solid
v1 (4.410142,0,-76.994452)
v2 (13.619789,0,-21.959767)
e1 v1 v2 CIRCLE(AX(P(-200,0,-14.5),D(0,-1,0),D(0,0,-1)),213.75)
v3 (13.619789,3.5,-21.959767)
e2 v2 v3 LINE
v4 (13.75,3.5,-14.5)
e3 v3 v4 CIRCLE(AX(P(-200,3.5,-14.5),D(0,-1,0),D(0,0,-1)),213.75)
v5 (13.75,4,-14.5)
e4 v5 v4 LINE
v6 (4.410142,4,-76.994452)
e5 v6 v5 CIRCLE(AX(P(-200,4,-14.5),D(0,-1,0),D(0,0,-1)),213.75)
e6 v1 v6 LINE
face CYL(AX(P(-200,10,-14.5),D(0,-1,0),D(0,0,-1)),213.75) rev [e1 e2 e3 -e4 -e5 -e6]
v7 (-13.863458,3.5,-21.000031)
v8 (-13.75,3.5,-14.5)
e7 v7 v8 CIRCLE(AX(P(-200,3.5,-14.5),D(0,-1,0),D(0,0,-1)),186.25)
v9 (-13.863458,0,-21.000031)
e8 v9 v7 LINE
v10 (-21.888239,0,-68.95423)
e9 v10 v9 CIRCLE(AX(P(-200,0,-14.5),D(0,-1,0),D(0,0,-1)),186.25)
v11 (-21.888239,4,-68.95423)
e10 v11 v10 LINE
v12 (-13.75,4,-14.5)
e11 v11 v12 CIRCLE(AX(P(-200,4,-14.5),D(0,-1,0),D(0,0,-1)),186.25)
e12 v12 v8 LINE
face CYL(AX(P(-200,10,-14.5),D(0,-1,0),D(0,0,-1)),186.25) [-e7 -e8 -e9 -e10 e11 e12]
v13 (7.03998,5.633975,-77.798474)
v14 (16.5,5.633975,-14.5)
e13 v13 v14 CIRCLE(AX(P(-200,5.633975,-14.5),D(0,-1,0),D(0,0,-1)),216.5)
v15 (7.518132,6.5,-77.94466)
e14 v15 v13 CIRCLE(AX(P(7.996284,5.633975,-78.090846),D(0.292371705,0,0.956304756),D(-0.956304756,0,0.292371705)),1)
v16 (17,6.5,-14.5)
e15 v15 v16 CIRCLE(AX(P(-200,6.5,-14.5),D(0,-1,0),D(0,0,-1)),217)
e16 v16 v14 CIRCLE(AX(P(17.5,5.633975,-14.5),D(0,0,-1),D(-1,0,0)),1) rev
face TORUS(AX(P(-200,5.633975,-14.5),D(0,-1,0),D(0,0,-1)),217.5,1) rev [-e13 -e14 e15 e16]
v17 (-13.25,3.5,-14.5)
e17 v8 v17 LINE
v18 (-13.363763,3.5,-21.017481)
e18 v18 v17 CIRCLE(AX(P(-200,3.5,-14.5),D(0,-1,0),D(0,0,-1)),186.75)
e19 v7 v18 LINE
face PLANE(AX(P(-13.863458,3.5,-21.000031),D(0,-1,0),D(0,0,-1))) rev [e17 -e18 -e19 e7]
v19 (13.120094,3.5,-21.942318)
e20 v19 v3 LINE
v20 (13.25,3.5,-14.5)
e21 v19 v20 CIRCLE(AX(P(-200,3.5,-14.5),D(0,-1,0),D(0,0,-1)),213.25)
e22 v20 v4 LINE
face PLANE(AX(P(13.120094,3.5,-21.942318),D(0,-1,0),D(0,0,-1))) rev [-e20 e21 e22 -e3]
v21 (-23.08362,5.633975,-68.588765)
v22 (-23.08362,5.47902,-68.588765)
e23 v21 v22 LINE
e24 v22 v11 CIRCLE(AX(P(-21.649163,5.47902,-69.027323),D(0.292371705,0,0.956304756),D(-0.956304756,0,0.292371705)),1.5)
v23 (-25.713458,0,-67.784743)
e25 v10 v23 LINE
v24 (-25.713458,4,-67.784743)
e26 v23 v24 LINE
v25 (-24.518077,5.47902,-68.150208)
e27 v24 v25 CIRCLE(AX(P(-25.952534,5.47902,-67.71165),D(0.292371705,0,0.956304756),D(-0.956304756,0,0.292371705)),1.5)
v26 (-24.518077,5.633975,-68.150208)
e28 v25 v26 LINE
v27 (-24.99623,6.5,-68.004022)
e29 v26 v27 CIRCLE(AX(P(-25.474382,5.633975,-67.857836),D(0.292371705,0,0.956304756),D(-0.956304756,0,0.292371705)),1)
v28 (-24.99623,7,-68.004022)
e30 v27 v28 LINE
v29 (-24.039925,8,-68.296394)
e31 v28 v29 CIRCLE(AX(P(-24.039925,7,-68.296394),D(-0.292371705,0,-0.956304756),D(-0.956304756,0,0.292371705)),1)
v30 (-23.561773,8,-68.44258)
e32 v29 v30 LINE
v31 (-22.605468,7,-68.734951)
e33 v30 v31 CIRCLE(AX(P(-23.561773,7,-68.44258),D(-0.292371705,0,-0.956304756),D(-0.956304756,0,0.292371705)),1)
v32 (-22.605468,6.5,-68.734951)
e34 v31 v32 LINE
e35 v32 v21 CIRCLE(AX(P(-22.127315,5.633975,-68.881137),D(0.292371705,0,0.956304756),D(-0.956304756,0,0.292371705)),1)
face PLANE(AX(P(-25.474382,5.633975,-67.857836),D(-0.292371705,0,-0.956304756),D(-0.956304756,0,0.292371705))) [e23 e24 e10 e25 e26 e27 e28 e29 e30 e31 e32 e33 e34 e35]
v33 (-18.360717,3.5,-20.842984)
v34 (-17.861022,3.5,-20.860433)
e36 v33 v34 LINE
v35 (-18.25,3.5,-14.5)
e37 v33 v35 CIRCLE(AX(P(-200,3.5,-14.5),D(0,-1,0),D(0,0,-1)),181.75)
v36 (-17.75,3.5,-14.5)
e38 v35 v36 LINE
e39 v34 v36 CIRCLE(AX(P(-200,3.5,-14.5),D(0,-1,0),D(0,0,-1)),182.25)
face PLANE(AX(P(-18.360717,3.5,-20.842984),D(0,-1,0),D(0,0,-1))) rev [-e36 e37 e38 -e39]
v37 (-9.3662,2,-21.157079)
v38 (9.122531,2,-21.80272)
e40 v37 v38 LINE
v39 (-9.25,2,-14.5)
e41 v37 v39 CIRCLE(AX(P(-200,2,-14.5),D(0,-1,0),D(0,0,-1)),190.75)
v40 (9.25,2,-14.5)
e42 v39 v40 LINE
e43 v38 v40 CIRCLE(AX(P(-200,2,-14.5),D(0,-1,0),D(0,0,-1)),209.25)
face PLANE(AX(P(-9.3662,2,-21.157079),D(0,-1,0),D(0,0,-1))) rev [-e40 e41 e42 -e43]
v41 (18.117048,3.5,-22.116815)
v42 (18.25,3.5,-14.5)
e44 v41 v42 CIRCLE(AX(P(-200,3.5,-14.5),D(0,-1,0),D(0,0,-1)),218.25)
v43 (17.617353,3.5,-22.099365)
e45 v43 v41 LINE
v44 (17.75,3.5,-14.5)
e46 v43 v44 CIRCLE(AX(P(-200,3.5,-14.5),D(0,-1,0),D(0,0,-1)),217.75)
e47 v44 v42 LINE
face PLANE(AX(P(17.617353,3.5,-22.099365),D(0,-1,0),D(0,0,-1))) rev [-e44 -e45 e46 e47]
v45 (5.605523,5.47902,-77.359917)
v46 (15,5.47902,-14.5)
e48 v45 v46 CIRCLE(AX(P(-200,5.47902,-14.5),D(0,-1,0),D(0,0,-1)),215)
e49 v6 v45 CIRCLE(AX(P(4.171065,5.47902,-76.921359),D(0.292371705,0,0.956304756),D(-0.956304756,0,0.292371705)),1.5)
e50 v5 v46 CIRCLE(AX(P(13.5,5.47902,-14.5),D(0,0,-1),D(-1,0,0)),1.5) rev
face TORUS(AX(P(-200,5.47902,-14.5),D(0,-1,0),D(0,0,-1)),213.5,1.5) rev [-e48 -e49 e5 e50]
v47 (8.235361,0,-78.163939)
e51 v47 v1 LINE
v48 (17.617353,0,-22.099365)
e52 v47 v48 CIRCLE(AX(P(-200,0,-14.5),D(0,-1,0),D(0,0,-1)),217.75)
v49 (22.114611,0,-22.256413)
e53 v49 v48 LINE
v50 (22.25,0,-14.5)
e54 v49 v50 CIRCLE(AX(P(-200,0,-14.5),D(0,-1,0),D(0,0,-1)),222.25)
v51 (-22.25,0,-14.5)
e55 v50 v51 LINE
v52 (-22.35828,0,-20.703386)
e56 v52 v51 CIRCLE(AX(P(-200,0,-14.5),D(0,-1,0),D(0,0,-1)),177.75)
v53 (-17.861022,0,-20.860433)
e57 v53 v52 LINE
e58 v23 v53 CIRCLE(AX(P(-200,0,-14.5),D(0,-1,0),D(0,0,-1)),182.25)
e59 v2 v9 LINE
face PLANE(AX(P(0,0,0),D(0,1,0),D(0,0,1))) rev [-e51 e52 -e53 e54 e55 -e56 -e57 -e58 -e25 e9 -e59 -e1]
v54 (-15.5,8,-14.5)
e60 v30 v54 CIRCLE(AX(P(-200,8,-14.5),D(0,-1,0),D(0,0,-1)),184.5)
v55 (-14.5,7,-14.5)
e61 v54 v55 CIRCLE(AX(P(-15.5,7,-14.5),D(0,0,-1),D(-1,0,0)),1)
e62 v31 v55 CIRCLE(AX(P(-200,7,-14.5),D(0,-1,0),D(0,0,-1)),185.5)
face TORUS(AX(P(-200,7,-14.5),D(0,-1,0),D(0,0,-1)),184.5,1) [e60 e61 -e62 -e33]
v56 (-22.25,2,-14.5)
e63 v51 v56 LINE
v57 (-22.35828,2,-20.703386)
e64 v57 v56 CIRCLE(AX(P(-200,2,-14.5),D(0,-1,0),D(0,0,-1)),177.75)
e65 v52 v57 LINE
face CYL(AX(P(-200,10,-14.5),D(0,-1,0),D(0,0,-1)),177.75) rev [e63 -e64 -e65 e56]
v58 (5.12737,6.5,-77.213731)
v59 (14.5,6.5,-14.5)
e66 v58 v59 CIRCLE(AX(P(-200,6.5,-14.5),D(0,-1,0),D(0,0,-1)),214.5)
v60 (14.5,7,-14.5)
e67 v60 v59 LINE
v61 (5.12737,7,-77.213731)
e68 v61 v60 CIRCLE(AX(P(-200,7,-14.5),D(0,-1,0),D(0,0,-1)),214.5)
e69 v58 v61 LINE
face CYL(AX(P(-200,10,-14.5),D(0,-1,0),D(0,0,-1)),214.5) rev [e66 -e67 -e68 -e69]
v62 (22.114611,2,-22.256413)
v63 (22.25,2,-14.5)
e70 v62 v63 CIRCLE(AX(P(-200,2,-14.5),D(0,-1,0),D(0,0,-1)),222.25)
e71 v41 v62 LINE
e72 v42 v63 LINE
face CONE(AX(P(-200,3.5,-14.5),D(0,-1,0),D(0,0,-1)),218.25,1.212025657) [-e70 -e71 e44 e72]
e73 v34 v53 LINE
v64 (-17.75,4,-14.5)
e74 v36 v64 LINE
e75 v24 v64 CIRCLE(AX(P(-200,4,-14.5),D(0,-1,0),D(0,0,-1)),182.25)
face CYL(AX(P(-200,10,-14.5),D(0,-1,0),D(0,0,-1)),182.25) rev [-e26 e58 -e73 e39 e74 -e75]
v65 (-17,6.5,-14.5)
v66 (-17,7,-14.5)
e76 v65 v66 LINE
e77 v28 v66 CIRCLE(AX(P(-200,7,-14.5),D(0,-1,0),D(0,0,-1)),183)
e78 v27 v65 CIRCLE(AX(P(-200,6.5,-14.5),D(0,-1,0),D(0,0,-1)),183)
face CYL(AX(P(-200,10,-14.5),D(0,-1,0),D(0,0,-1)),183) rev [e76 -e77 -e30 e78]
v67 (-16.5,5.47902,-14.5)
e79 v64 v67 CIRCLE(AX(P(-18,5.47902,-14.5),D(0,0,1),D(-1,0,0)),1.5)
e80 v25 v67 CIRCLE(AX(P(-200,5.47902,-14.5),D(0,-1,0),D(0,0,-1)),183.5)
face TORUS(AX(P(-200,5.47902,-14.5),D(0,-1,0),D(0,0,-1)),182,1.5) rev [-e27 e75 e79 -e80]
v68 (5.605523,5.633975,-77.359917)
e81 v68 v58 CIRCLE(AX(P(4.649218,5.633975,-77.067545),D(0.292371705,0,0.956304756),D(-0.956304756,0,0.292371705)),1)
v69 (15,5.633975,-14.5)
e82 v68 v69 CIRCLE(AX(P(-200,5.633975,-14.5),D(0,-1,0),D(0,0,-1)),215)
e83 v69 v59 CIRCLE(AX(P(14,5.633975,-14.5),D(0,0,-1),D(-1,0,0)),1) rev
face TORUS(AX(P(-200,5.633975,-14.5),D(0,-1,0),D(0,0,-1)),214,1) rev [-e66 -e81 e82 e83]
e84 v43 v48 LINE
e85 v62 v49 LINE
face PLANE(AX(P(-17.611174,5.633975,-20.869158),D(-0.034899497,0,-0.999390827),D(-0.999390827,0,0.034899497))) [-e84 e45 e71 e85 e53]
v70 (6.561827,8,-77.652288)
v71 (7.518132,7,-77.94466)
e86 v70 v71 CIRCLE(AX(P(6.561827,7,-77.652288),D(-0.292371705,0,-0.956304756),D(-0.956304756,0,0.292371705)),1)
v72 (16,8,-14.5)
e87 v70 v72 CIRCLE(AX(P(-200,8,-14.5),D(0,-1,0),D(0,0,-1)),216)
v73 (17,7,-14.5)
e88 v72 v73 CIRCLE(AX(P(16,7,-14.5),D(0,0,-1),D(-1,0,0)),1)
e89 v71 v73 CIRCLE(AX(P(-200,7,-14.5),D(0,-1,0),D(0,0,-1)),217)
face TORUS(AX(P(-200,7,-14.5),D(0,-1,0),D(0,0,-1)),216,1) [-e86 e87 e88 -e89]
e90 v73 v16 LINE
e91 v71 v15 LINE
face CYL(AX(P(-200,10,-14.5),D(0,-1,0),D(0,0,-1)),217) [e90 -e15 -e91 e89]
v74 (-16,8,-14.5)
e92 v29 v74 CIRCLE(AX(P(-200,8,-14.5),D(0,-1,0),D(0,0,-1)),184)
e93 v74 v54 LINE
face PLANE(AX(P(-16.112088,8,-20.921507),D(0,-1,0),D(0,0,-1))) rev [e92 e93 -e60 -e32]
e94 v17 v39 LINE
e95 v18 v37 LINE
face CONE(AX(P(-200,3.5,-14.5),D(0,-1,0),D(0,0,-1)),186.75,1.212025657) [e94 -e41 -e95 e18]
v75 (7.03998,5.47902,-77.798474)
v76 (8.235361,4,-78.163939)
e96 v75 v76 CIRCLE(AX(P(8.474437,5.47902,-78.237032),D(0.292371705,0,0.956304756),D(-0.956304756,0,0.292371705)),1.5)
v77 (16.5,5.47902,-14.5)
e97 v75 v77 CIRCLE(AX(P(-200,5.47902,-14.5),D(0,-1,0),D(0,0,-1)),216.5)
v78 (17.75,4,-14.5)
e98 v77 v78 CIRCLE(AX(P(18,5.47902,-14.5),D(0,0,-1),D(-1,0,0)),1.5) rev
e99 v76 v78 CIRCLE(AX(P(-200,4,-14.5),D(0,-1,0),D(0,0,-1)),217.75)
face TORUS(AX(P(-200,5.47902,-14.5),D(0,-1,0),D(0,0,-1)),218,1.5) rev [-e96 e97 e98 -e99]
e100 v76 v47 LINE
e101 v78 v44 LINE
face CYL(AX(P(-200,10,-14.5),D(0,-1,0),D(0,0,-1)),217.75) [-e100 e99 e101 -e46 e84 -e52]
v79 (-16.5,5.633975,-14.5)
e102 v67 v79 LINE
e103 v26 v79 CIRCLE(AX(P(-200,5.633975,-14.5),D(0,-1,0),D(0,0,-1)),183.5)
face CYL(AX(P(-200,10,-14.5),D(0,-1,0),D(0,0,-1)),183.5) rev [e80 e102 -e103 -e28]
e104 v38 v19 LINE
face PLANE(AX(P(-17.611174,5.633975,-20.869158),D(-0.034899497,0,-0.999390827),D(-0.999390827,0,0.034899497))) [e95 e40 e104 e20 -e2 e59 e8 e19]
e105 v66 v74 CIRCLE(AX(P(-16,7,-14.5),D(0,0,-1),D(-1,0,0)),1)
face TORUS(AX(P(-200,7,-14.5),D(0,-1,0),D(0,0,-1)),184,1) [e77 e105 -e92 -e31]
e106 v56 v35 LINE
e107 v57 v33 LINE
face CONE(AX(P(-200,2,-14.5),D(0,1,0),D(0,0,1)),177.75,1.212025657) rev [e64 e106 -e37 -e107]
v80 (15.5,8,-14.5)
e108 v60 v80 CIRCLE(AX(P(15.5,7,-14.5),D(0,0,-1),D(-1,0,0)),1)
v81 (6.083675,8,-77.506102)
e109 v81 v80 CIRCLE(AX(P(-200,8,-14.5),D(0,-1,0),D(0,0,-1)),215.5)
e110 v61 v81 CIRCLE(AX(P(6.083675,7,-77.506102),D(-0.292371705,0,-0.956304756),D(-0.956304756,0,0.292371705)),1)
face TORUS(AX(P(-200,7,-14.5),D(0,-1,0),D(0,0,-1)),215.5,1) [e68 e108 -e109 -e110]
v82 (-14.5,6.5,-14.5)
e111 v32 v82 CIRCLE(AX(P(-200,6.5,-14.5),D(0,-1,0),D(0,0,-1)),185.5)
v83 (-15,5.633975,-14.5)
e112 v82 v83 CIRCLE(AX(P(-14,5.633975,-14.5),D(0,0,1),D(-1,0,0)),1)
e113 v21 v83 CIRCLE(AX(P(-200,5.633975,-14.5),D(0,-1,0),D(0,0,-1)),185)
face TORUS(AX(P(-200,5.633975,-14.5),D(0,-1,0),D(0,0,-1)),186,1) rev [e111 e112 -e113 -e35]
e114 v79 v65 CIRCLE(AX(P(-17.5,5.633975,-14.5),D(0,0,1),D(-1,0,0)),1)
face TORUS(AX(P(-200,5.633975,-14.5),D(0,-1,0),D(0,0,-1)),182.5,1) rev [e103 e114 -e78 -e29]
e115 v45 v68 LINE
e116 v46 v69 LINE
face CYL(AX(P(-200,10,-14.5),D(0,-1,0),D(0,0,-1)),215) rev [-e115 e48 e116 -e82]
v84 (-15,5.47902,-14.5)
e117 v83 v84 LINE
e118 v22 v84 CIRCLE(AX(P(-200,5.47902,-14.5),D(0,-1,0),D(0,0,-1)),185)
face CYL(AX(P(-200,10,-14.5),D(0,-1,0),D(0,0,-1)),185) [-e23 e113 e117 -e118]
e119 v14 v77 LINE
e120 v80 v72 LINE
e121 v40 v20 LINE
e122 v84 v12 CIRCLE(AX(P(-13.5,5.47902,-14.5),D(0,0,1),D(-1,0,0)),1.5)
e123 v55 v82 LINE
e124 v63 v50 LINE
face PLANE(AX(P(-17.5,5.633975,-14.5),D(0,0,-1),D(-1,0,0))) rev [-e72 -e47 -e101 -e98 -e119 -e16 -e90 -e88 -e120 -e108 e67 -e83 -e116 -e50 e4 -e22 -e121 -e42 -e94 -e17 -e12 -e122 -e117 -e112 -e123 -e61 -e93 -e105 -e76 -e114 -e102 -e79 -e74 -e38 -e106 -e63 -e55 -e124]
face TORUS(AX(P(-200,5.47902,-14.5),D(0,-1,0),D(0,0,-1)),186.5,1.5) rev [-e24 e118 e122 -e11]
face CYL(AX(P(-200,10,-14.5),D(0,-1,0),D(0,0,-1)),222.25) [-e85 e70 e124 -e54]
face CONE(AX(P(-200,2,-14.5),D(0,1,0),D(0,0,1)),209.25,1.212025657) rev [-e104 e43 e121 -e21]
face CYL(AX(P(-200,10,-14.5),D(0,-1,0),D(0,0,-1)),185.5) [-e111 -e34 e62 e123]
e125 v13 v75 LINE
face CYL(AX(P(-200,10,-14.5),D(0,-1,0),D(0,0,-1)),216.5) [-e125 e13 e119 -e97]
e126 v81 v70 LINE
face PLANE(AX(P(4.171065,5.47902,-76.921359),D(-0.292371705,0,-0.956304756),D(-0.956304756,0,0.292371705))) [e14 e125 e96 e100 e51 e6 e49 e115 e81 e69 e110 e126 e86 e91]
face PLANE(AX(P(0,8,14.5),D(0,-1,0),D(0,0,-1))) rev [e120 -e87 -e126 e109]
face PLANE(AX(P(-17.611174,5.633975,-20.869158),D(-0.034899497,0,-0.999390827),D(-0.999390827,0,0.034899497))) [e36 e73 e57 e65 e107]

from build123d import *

# Parameters (mm, degrees)
SKETCH_1_W          = 4
SKETCH_1_H          = 21
SKETCH_1_H_2        = 8
EXTRUDE_1_DEPTH     = 4
SKETCH_1_7_W        = 44.5
SKETCH_1_7_H        = 8
EXTRUDE_2_DEPTH     = 3.5
SKETCH_2_W          = 18.5
SKETCH_2_H          = 1.5
CUT_EXTRUDE_1_DEPTH = 37.7704025
SKETCH_2_3_W        = 2.5
SKETCH_2_3_H        = 1.5
EXTRUDE_4_DEPTH     = 29
FILLET_1_R          = 1
FILLET_2_R          = 1.5
FILLET_3_R          = 1
REVOLVE_2_ANGLE     = 17
CUT_EXTRUDE_5_DEPTH = 70.125096927
REVOLVE_1_ANGLE     = 2


with BuildPart() as part:
    # 草图1 → 凸台-拉伸1 (new body)
    with BuildSketch(Plane(origin=(0, 0, 0), x_dir=(1, 0, 0), z_dir=(0, 1, 0))):
        with Locations((-15.75, -4)):
            Rectangle(SKETCH_1_W, SKETCH_1_H)
        with Locations((15.75, -4)):
            Rectangle(SKETCH_1_W, SKETCH_1_H)
        with Locations((15.75, 10.5)):
            Rectangle(SKETCH_1_W, SKETCH_1_H_2)
        with Locations((-15.75, 10.5)):
            Rectangle(SKETCH_1_W, SKETCH_1_H_2)
    extrude(amount=EXTRUDE_1_DEPTH)

    # 草图1<7> → 凸台-拉伸2 (add)
    with BuildSketch(Plane(origin=(0, 0, 0), x_dir=(1, 0, 0), z_dir=(0, 1, 0))):
        with Locations((0, 10.5)):
            Rectangle(SKETCH_1_7_W, SKETCH_1_7_H)
    extrude(amount=EXTRUDE_2_DEPTH)

    # 草图2 → 切除-拉伸1 (cut, through all)
    with BuildSketch(Plane(origin=(0, 0, -14.5), x_dir=(-1, 0, 0), z_dir=(0, 0, -1))):
        with Locations((0, 2.75)):
            Rectangle(SKETCH_2_W, SKETCH_2_H)
        Polygon((13.25, 3.5), (9.25, 3.5), (9.25, 2), align=None)
        Polygon((-9.25, 3.5), (-13.25, 3.5), (-9.25, 2), align=None)
        Polygon((-22.25, 3.5), (-22.25, 2), (-18.25, 3.5), align=None)
        Polygon((22.25, 3.5), (18.25, 3.5), (22.25, 2), align=None)
    extrude(amount=-CUT_EXTRUDE_1_DEPTH, mode=Mode.SUBTRACT)

    # 草图2<3> → 凸台-拉伸4 (add, through all)
    with BuildSketch(Plane(origin=(0, 0, -14.5), x_dir=(-1, 0, 0), z_dir=(0, 0, -1))):
        with Locations((-15.75, 7.25)):
            Rectangle(SKETCH_2_3_W, SKETCH_2_3_H)
        Polygon((-15, 6.5), (-16.5, 6.5), (-16.5, 4), (-15.75, 4), (-15, 4), align=None)
        with Locations((15.75, 7.25)):
            Rectangle(SKETCH_2_3_W, SKETCH_2_3_H)
        Polygon((16.5, 6.5), (15, 6.5), (15, 4), (15.75, 4), (16.5, 4), align=None)
    extrude(amount=-EXTRUDE_4_DEPTH)

    # 圆角1
    # the kernel refuses this fillet: 1 mm, written as the material it adds along each edge
    with BuildSketch(Plane(origin=(-16.5, 6.5, -14.5), x_dir=(-1, 0, 0), z_dir=(0, 0, 1)), Plane(origin=(15, 6.5, -14.5), x_dir=(-1, 0, 0), z_dir=(0, 0, 1))) as fillet_1_piece_1:
        with BuildLine():
            CenterArc((1, 0.866025404), FILLET_1_R, 180, 60)
            Line((0, 0.866025404), (-0.02, 0.866025404))
            Line((-0.02, 0.866025404), (-0.02, 0))
            Line((-0.02, 0), (0, -0.02))
            ThreePointArc((0, -0.02), (0.25, -0.02), (0.49, -0.017320508))
            Line((0.49, -0.017320508), (0.5, 0))
        make_face()
    extrude(amount=29)
    with BuildSketch(Plane(origin=(-15, 6.5, -14.5), x_dir=(0, -1, 0), z_dir=(0, 0, 1)), Plane(origin=(16.5, 6.5, -14.5), x_dir=(0, -1, 0), z_dir=(0, 0, 1))) as fillet_1_piece_2:
        with BuildLine():
            CenterArc((0.866025404, 1), FILLET_1_R, 210, 60)
            Line((0, 0.5), (-0.017320508, 0.49))
            ThreePointArc((-0.017320508, 0.49), (-0.02, 0.25), (-0.02, 0))
            Line((-0.02, 0), (0, -0.02))
            Line((0, -0.02), (0.866025404, -0.02))
            Line((0.866025404, -0.02), (0.866025404, 0))
        make_face()
    extrude(amount=29)

    # 圆角2
    # the kernel refuses this fillet: 1.5 mm, written as the material it adds along each edge
    with BuildSketch(Plane(origin=(16.5, 4, -14.5), x_dir=(1, 0, 0), z_dir=(0, 0, 1))) as fillet_2_piece_1:
        with BuildLine():
            CenterArc((1.5, 1.479019946), FILLET_2_R, 180, 80.405931773)
            Line((0, 1.479019946), (-0.03, 1.479019946))
            Line((-0.03, 1.479019946), (-0.03, 0))
            Line((-0.03, 0), (0, -0.03))
            ThreePointArc((0, -0.03), (0.625, -0.03), (1.245, -0.029580399))
            Line((1.245, -0.029580399), (1.25, 0))
        make_face()
    extrude(amount=29)
    with BuildSketch(Plane(origin=(15, 4, -14.5), x_dir=(0, 1, 0), z_dir=(0, 0, 1)), Plane(origin=(-16.5, 4, -14.5), x_dir=(0, 1, 0), z_dir=(0, 0, 1))) as fillet_2_piece_2:
        with BuildLine():
            CenterArc((1.479019946, 1.5), FILLET_2_R, 189.594068227, 80.405931773)
            Line((0, 1.25), (-0.029580399, 1.245))
            ThreePointArc((-0.029580399, 1.245), (-0.03, 0.625), (-0.03, 0))
            Line((-0.03, 0), (0, -0.03))
            Line((0, -0.03), (1.479019946, -0.03))
            Line((1.479019946, -0.03), (1.479019946, 0))
        make_face()
    extrude(amount=29)
    with BuildSketch(Plane(origin=(-15, 4, -14.5), x_dir=(0, 1, 0), z_dir=(0, 0, 1))) as fillet_2_piece_3:
        with BuildLine():
            CenterArc((1.479019946, -1.5), FILLET_2_R, 90, 80.405931773)
            Line((0, -1.25), (-0.029580399, -1.245))
            ThreePointArc((-0.029580399, -1.245), (-0.03, -0.625), (-0.03, 0))
            Line((-0.03, 0), (0, 0.03))
            Line((0, 0.03), (1.479019946, 0.03))
            Line((1.479019946, 0.03), (1.479019946, 0))
        make_face()
    extrude(amount=29)

    # 圆角3
    fillet_3_edges = [part.edges().sort_by_distance(p)[0] for p in [
        (14.5, 8, 0),
        (17, 8, 0),
        (-17, 8, 0),
        (-14.5, 8, 0),
    ]]
    fillet(fillet_3_edges, radius=FILLET_3_R)

    # 草图7 → 旋转2 (revolve)
    with BuildSketch(Plane(origin=(0, 0, -14.5), x_dir=(-1, 0, 0), z_dir=(0, 0, -1))):
        with BuildLine():
            Line((-17.75, 3.5), (-17.75, 0))
            Line((-17.75, 0), (-13.75, 0))
            Line((-13.75, 0), (-13.75, 3.5))
            Line((-13.75, 3.5), (-13.75, 4))
            ThreePointArc((-13.75, 4), (-14.645643924, 4.510774109), (-15, 5.479019946))
            Line((-15, 5.479019946), (-15, 5.633974596))
            ThreePointArc((-15, 5.633974596), (-14.866025404, 6.133974596), (-14.5, 6.5))
            Line((-14.5, 6.5), (-14.5, 7))
            ThreePointArc((-14.5, 7), (-14.792893219, 7.707106781), (-15.5, 8))
            Line((-15.5, 8), (-16, 8))
            ThreePointArc((-16, 8), (-16.707106781, 7.707106781), (-17, 7))
            Line((-17, 7), (-17, 6.5))
            ThreePointArc((-17, 6.5), (-16.633974596, 6.133974596), (-16.5, 5.633974596))
            Line((-16.5, 5.633974596), (-16.5, 5.479019946))
            ThreePointArc((-16.5, 5.479019946), (-16.854356076, 4.510774109), (-17.75, 4))
            Line((-17.75, 4), (-17.75, 3.5))
        make_face()
        with BuildLine():
            Line((13.75, 3.5), (13.75, 0))
            Line((13.75, 0), (17.75, 0))
            Line((17.75, 0), (17.75, 3.5))
            Line((17.75, 3.5), (17.75, 4))
            ThreePointArc((17.75, 4), (16.854356076, 4.510774109), (16.5, 5.479019946))
            Line((16.5, 5.479019946), (16.5, 5.633974596))
            ThreePointArc((16.5, 5.633974596), (16.633974596, 6.133974596), (17, 6.5))
            Line((17, 6.5), (17, 7))
            ThreePointArc((17, 7), (16.707106781, 7.707106781), (16, 8))
            Line((16, 8), (15.5, 8))
            ThreePointArc((15.5, 8), (14.792893219, 7.707106781), (14.5, 7))
            Line((14.5, 7), (14.5, 6.5))
            ThreePointArc((14.5, 6.5), (14.866025404, 6.133974596), (15, 5.633974596))
            Line((15, 5.633974596), (15, 5.479019946))
            ThreePointArc((15, 5.479019946), (14.645643924, 4.510774109), (13.75, 4))
            Line((13.75, 4), (13.75, 3.5))
        make_face()
    revolve(axis=Axis((-200, 10, -14.5), (0, 1, 0)), revolution_arc=REVOLVE_2_ANGLE)

    # 草图5<2> → 切除-拉伸5 (cut, through all)
    with BuildSketch(Plane(origin=(0, 0, -14.5), x_dir=(-1, 0, 0), z_dir=(0, 0, -1))):
        with BuildLine():
            Line((17, 6.5), (17, 7))
            ThreePointArc((17, 7), (16.707106781, 7.707106781), (16, 8))
            Line((16, 8), (15.5, 8))
            ThreePointArc((15.5, 8), (14.792893219, 7.707106781), (14.5, 7))
            Line((14.5, 7), (14.5, 6.5))
            ThreePointArc((14.5, 6.5), (14.866025404, 6.133974596), (15, 5.633974596))
            Line((15, 5.633974596), (15, 5.479019946))
            ThreePointArc((15, 5.479019946), (14.645643924, 4.510774109), (13.75, 4))
            Line((13.75, 4), (13.75, 3.5))
            Line((13.75, 3.5), (13.25, 3.5))
            Line((13.25, 3.5), (9.25, 2))
            Line((9.25, 2), (-9.25, 2))
            Line((-9.25, 2), (-13.25, 3.5))
            Line((-13.25, 3.5), (-13.75, 3.5))
            Line((-13.75, 3.5), (-13.75, 4))
            ThreePointArc((-13.75, 4), (-14.645643924, 4.510774109), (-15, 5.479019946))
            Line((-15, 5.479019946), (-15, 5.633974596))
            ThreePointArc((-15, 5.633974596), (-14.866025404, 6.133974596), (-14.5, 6.5))
            Line((-14.5, 6.5), (-14.5, 7))
            ThreePointArc((-14.5, 7), (-14.792893219, 7.707106781), (-15.5, 8))
            Line((-15.5, 8), (-16, 8))
            ThreePointArc((-16, 8), (-16.707106781, 7.707106781), (-17, 7))
            Line((-17, 7), (-17, 6.5))
            ThreePointArc((-17, 6.5), (-16.633974596, 6.133974596), (-16.5, 5.633974596))
            Line((-16.5, 5.633974596), (-16.5, 5.479019946))
            ThreePointArc((-16.5, 5.479019946), (-16.854356076, 4.510774109), (-17.75, 4))
            Line((-17.75, 4), (-17.75, 3.5))
            Line((-17.75, 3.5), (-18.25, 3.5))
            Line((-18.25, 3.5), (-22.25, 2))
            Line((-22.25, 2), (-22.25, 0))
            Line((-22.25, 0), (22.25, 0))
            Line((22.25, 0), (22.25, 2))
            Line((22.25, 2), (18.25, 3.5))
            Line((18.25, 3.5), (17.75, 3.5))
            Line((17.75, 3.5), (17.75, 4))
            ThreePointArc((17.75, 4), (16.854356076, 4.510774109), (16.5, 5.479019946))
            Line((16.5, 5.479019946), (16.5, 5.633974596))
            ThreePointArc((16.5, 5.633974596), (16.633974596, 6.133974596), (17, 6.5))
        make_face()
    extrude(amount=-CUT_EXTRUDE_5_DEPTH, mode=Mode.SUBTRACT)


with BuildPart() as cut_extrude_5_piece_1:
    # of the separate pieces the step leaves, piece 1, a body of its own (cut_extrude_5_pieces)
    add(part.part.solids().sort_by_distance((13.75, 0, -14.5))[0])



with BuildPart() as cut_extrude_5_piece_2:
    # of the separate pieces the step leaves, piece 2, a body of its own (cut_extrude_5_pieces)
    add(part.part.solids().sort_by_distance((-13.75, 4, -14.5))[0])


with BuildPart() as cut_extrude_5_piece_1_1:
    add(cut_extrude_5_piece_1.part)

    add(cut_extrude_5_piece_2.part)  # 旋转1 merges 切除-拉伸5 piece 2
    # 草图5 → 旋转1 (revolve)
    with BuildSketch(Plane(origin=(0, 0, -14.5), x_dir=(-1, 0, 0), z_dir=(0, 0, -1))):
        with BuildLine():
            Line((17, 6.5), (17, 7))
            ThreePointArc((17, 7), (16.707106781, 7.707106781), (16, 8))
            Line((16, 8), (15.5, 8))
            ThreePointArc((15.5, 8), (14.792893219, 7.707106781), (14.5, 7))
            Line((14.5, 7), (14.5, 6.5))
            ThreePointArc((14.5, 6.5), (14.866025404, 6.133974596), (15, 5.633974596))
            Line((15, 5.633974596), (15, 5.479019946))
            ThreePointArc((15, 5.479019946), (14.645643924, 4.510774109), (13.75, 4))
            Line((13.75, 4), (13.75, 3.5))
            Line((13.75, 3.5), (13.25, 3.5))
            Line((13.25, 3.5), (9.25, 2))
            Line((9.25, 2), (-9.25, 2))
            Line((-9.25, 2), (-13.25, 3.5))
            Line((-13.25, 3.5), (-13.75, 3.5))
            Line((-13.75, 3.5), (-13.75, 4))
            ThreePointArc((-13.75, 4), (-14.645643924, 4.510774109), (-15, 5.479019946))
            Line((-15, 5.479019946), (-15, 5.633974596))
            ThreePointArc((-15, 5.633974596), (-14.866025404, 6.133974596), (-14.5, 6.5))
            Line((-14.5, 6.5), (-14.5, 7))
            ThreePointArc((-14.5, 7), (-14.792893219, 7.707106781), (-15.5, 8))
            Line((-15.5, 8), (-16, 8))
            ThreePointArc((-16, 8), (-16.707106781, 7.707106781), (-17, 7))
            Line((-17, 7), (-17, 6.5))
            ThreePointArc((-17, 6.5), (-16.633974596, 6.133974596), (-16.5, 5.633974596))
            Line((-16.5, 5.633974596), (-16.5, 5.479019946))
            ThreePointArc((-16.5, 5.479019946), (-16.854356076, 4.510774109), (-17.75, 4))
            Line((-17.75, 4), (-17.75, 3.5))
            Line((-17.75, 3.5), (-18.25, 3.5))
            Line((-18.25, 3.5), (-22.25, 2))
            Line((-22.25, 2), (-22.25, 0))
            Line((-22.25, 0), (22.25, 0))
            Line((22.25, 0), (22.25, 2))
            Line((22.25, 2), (18.25, 3.5))
            Line((18.25, 3.5), (17.75, 3.5))
            Line((17.75, 3.5), (17.75, 4))
            ThreePointArc((17.75, 4), (16.854356076, 4.510774109), (16.5, 5.479019946))
            Line((16.5, 5.479019946), (16.5, 5.633974596))
            ThreePointArc((16.5, 5.633974596), (16.633974596, 6.133974596), (17, 6.5))
        make_face()
    revolve(axis=Axis((-200, 10, -14.5), (0, 1, 0)), revolution_arc=REVOLVE_1_ANGLE)


solid = cut_extrude_5_piece_1_1.part
